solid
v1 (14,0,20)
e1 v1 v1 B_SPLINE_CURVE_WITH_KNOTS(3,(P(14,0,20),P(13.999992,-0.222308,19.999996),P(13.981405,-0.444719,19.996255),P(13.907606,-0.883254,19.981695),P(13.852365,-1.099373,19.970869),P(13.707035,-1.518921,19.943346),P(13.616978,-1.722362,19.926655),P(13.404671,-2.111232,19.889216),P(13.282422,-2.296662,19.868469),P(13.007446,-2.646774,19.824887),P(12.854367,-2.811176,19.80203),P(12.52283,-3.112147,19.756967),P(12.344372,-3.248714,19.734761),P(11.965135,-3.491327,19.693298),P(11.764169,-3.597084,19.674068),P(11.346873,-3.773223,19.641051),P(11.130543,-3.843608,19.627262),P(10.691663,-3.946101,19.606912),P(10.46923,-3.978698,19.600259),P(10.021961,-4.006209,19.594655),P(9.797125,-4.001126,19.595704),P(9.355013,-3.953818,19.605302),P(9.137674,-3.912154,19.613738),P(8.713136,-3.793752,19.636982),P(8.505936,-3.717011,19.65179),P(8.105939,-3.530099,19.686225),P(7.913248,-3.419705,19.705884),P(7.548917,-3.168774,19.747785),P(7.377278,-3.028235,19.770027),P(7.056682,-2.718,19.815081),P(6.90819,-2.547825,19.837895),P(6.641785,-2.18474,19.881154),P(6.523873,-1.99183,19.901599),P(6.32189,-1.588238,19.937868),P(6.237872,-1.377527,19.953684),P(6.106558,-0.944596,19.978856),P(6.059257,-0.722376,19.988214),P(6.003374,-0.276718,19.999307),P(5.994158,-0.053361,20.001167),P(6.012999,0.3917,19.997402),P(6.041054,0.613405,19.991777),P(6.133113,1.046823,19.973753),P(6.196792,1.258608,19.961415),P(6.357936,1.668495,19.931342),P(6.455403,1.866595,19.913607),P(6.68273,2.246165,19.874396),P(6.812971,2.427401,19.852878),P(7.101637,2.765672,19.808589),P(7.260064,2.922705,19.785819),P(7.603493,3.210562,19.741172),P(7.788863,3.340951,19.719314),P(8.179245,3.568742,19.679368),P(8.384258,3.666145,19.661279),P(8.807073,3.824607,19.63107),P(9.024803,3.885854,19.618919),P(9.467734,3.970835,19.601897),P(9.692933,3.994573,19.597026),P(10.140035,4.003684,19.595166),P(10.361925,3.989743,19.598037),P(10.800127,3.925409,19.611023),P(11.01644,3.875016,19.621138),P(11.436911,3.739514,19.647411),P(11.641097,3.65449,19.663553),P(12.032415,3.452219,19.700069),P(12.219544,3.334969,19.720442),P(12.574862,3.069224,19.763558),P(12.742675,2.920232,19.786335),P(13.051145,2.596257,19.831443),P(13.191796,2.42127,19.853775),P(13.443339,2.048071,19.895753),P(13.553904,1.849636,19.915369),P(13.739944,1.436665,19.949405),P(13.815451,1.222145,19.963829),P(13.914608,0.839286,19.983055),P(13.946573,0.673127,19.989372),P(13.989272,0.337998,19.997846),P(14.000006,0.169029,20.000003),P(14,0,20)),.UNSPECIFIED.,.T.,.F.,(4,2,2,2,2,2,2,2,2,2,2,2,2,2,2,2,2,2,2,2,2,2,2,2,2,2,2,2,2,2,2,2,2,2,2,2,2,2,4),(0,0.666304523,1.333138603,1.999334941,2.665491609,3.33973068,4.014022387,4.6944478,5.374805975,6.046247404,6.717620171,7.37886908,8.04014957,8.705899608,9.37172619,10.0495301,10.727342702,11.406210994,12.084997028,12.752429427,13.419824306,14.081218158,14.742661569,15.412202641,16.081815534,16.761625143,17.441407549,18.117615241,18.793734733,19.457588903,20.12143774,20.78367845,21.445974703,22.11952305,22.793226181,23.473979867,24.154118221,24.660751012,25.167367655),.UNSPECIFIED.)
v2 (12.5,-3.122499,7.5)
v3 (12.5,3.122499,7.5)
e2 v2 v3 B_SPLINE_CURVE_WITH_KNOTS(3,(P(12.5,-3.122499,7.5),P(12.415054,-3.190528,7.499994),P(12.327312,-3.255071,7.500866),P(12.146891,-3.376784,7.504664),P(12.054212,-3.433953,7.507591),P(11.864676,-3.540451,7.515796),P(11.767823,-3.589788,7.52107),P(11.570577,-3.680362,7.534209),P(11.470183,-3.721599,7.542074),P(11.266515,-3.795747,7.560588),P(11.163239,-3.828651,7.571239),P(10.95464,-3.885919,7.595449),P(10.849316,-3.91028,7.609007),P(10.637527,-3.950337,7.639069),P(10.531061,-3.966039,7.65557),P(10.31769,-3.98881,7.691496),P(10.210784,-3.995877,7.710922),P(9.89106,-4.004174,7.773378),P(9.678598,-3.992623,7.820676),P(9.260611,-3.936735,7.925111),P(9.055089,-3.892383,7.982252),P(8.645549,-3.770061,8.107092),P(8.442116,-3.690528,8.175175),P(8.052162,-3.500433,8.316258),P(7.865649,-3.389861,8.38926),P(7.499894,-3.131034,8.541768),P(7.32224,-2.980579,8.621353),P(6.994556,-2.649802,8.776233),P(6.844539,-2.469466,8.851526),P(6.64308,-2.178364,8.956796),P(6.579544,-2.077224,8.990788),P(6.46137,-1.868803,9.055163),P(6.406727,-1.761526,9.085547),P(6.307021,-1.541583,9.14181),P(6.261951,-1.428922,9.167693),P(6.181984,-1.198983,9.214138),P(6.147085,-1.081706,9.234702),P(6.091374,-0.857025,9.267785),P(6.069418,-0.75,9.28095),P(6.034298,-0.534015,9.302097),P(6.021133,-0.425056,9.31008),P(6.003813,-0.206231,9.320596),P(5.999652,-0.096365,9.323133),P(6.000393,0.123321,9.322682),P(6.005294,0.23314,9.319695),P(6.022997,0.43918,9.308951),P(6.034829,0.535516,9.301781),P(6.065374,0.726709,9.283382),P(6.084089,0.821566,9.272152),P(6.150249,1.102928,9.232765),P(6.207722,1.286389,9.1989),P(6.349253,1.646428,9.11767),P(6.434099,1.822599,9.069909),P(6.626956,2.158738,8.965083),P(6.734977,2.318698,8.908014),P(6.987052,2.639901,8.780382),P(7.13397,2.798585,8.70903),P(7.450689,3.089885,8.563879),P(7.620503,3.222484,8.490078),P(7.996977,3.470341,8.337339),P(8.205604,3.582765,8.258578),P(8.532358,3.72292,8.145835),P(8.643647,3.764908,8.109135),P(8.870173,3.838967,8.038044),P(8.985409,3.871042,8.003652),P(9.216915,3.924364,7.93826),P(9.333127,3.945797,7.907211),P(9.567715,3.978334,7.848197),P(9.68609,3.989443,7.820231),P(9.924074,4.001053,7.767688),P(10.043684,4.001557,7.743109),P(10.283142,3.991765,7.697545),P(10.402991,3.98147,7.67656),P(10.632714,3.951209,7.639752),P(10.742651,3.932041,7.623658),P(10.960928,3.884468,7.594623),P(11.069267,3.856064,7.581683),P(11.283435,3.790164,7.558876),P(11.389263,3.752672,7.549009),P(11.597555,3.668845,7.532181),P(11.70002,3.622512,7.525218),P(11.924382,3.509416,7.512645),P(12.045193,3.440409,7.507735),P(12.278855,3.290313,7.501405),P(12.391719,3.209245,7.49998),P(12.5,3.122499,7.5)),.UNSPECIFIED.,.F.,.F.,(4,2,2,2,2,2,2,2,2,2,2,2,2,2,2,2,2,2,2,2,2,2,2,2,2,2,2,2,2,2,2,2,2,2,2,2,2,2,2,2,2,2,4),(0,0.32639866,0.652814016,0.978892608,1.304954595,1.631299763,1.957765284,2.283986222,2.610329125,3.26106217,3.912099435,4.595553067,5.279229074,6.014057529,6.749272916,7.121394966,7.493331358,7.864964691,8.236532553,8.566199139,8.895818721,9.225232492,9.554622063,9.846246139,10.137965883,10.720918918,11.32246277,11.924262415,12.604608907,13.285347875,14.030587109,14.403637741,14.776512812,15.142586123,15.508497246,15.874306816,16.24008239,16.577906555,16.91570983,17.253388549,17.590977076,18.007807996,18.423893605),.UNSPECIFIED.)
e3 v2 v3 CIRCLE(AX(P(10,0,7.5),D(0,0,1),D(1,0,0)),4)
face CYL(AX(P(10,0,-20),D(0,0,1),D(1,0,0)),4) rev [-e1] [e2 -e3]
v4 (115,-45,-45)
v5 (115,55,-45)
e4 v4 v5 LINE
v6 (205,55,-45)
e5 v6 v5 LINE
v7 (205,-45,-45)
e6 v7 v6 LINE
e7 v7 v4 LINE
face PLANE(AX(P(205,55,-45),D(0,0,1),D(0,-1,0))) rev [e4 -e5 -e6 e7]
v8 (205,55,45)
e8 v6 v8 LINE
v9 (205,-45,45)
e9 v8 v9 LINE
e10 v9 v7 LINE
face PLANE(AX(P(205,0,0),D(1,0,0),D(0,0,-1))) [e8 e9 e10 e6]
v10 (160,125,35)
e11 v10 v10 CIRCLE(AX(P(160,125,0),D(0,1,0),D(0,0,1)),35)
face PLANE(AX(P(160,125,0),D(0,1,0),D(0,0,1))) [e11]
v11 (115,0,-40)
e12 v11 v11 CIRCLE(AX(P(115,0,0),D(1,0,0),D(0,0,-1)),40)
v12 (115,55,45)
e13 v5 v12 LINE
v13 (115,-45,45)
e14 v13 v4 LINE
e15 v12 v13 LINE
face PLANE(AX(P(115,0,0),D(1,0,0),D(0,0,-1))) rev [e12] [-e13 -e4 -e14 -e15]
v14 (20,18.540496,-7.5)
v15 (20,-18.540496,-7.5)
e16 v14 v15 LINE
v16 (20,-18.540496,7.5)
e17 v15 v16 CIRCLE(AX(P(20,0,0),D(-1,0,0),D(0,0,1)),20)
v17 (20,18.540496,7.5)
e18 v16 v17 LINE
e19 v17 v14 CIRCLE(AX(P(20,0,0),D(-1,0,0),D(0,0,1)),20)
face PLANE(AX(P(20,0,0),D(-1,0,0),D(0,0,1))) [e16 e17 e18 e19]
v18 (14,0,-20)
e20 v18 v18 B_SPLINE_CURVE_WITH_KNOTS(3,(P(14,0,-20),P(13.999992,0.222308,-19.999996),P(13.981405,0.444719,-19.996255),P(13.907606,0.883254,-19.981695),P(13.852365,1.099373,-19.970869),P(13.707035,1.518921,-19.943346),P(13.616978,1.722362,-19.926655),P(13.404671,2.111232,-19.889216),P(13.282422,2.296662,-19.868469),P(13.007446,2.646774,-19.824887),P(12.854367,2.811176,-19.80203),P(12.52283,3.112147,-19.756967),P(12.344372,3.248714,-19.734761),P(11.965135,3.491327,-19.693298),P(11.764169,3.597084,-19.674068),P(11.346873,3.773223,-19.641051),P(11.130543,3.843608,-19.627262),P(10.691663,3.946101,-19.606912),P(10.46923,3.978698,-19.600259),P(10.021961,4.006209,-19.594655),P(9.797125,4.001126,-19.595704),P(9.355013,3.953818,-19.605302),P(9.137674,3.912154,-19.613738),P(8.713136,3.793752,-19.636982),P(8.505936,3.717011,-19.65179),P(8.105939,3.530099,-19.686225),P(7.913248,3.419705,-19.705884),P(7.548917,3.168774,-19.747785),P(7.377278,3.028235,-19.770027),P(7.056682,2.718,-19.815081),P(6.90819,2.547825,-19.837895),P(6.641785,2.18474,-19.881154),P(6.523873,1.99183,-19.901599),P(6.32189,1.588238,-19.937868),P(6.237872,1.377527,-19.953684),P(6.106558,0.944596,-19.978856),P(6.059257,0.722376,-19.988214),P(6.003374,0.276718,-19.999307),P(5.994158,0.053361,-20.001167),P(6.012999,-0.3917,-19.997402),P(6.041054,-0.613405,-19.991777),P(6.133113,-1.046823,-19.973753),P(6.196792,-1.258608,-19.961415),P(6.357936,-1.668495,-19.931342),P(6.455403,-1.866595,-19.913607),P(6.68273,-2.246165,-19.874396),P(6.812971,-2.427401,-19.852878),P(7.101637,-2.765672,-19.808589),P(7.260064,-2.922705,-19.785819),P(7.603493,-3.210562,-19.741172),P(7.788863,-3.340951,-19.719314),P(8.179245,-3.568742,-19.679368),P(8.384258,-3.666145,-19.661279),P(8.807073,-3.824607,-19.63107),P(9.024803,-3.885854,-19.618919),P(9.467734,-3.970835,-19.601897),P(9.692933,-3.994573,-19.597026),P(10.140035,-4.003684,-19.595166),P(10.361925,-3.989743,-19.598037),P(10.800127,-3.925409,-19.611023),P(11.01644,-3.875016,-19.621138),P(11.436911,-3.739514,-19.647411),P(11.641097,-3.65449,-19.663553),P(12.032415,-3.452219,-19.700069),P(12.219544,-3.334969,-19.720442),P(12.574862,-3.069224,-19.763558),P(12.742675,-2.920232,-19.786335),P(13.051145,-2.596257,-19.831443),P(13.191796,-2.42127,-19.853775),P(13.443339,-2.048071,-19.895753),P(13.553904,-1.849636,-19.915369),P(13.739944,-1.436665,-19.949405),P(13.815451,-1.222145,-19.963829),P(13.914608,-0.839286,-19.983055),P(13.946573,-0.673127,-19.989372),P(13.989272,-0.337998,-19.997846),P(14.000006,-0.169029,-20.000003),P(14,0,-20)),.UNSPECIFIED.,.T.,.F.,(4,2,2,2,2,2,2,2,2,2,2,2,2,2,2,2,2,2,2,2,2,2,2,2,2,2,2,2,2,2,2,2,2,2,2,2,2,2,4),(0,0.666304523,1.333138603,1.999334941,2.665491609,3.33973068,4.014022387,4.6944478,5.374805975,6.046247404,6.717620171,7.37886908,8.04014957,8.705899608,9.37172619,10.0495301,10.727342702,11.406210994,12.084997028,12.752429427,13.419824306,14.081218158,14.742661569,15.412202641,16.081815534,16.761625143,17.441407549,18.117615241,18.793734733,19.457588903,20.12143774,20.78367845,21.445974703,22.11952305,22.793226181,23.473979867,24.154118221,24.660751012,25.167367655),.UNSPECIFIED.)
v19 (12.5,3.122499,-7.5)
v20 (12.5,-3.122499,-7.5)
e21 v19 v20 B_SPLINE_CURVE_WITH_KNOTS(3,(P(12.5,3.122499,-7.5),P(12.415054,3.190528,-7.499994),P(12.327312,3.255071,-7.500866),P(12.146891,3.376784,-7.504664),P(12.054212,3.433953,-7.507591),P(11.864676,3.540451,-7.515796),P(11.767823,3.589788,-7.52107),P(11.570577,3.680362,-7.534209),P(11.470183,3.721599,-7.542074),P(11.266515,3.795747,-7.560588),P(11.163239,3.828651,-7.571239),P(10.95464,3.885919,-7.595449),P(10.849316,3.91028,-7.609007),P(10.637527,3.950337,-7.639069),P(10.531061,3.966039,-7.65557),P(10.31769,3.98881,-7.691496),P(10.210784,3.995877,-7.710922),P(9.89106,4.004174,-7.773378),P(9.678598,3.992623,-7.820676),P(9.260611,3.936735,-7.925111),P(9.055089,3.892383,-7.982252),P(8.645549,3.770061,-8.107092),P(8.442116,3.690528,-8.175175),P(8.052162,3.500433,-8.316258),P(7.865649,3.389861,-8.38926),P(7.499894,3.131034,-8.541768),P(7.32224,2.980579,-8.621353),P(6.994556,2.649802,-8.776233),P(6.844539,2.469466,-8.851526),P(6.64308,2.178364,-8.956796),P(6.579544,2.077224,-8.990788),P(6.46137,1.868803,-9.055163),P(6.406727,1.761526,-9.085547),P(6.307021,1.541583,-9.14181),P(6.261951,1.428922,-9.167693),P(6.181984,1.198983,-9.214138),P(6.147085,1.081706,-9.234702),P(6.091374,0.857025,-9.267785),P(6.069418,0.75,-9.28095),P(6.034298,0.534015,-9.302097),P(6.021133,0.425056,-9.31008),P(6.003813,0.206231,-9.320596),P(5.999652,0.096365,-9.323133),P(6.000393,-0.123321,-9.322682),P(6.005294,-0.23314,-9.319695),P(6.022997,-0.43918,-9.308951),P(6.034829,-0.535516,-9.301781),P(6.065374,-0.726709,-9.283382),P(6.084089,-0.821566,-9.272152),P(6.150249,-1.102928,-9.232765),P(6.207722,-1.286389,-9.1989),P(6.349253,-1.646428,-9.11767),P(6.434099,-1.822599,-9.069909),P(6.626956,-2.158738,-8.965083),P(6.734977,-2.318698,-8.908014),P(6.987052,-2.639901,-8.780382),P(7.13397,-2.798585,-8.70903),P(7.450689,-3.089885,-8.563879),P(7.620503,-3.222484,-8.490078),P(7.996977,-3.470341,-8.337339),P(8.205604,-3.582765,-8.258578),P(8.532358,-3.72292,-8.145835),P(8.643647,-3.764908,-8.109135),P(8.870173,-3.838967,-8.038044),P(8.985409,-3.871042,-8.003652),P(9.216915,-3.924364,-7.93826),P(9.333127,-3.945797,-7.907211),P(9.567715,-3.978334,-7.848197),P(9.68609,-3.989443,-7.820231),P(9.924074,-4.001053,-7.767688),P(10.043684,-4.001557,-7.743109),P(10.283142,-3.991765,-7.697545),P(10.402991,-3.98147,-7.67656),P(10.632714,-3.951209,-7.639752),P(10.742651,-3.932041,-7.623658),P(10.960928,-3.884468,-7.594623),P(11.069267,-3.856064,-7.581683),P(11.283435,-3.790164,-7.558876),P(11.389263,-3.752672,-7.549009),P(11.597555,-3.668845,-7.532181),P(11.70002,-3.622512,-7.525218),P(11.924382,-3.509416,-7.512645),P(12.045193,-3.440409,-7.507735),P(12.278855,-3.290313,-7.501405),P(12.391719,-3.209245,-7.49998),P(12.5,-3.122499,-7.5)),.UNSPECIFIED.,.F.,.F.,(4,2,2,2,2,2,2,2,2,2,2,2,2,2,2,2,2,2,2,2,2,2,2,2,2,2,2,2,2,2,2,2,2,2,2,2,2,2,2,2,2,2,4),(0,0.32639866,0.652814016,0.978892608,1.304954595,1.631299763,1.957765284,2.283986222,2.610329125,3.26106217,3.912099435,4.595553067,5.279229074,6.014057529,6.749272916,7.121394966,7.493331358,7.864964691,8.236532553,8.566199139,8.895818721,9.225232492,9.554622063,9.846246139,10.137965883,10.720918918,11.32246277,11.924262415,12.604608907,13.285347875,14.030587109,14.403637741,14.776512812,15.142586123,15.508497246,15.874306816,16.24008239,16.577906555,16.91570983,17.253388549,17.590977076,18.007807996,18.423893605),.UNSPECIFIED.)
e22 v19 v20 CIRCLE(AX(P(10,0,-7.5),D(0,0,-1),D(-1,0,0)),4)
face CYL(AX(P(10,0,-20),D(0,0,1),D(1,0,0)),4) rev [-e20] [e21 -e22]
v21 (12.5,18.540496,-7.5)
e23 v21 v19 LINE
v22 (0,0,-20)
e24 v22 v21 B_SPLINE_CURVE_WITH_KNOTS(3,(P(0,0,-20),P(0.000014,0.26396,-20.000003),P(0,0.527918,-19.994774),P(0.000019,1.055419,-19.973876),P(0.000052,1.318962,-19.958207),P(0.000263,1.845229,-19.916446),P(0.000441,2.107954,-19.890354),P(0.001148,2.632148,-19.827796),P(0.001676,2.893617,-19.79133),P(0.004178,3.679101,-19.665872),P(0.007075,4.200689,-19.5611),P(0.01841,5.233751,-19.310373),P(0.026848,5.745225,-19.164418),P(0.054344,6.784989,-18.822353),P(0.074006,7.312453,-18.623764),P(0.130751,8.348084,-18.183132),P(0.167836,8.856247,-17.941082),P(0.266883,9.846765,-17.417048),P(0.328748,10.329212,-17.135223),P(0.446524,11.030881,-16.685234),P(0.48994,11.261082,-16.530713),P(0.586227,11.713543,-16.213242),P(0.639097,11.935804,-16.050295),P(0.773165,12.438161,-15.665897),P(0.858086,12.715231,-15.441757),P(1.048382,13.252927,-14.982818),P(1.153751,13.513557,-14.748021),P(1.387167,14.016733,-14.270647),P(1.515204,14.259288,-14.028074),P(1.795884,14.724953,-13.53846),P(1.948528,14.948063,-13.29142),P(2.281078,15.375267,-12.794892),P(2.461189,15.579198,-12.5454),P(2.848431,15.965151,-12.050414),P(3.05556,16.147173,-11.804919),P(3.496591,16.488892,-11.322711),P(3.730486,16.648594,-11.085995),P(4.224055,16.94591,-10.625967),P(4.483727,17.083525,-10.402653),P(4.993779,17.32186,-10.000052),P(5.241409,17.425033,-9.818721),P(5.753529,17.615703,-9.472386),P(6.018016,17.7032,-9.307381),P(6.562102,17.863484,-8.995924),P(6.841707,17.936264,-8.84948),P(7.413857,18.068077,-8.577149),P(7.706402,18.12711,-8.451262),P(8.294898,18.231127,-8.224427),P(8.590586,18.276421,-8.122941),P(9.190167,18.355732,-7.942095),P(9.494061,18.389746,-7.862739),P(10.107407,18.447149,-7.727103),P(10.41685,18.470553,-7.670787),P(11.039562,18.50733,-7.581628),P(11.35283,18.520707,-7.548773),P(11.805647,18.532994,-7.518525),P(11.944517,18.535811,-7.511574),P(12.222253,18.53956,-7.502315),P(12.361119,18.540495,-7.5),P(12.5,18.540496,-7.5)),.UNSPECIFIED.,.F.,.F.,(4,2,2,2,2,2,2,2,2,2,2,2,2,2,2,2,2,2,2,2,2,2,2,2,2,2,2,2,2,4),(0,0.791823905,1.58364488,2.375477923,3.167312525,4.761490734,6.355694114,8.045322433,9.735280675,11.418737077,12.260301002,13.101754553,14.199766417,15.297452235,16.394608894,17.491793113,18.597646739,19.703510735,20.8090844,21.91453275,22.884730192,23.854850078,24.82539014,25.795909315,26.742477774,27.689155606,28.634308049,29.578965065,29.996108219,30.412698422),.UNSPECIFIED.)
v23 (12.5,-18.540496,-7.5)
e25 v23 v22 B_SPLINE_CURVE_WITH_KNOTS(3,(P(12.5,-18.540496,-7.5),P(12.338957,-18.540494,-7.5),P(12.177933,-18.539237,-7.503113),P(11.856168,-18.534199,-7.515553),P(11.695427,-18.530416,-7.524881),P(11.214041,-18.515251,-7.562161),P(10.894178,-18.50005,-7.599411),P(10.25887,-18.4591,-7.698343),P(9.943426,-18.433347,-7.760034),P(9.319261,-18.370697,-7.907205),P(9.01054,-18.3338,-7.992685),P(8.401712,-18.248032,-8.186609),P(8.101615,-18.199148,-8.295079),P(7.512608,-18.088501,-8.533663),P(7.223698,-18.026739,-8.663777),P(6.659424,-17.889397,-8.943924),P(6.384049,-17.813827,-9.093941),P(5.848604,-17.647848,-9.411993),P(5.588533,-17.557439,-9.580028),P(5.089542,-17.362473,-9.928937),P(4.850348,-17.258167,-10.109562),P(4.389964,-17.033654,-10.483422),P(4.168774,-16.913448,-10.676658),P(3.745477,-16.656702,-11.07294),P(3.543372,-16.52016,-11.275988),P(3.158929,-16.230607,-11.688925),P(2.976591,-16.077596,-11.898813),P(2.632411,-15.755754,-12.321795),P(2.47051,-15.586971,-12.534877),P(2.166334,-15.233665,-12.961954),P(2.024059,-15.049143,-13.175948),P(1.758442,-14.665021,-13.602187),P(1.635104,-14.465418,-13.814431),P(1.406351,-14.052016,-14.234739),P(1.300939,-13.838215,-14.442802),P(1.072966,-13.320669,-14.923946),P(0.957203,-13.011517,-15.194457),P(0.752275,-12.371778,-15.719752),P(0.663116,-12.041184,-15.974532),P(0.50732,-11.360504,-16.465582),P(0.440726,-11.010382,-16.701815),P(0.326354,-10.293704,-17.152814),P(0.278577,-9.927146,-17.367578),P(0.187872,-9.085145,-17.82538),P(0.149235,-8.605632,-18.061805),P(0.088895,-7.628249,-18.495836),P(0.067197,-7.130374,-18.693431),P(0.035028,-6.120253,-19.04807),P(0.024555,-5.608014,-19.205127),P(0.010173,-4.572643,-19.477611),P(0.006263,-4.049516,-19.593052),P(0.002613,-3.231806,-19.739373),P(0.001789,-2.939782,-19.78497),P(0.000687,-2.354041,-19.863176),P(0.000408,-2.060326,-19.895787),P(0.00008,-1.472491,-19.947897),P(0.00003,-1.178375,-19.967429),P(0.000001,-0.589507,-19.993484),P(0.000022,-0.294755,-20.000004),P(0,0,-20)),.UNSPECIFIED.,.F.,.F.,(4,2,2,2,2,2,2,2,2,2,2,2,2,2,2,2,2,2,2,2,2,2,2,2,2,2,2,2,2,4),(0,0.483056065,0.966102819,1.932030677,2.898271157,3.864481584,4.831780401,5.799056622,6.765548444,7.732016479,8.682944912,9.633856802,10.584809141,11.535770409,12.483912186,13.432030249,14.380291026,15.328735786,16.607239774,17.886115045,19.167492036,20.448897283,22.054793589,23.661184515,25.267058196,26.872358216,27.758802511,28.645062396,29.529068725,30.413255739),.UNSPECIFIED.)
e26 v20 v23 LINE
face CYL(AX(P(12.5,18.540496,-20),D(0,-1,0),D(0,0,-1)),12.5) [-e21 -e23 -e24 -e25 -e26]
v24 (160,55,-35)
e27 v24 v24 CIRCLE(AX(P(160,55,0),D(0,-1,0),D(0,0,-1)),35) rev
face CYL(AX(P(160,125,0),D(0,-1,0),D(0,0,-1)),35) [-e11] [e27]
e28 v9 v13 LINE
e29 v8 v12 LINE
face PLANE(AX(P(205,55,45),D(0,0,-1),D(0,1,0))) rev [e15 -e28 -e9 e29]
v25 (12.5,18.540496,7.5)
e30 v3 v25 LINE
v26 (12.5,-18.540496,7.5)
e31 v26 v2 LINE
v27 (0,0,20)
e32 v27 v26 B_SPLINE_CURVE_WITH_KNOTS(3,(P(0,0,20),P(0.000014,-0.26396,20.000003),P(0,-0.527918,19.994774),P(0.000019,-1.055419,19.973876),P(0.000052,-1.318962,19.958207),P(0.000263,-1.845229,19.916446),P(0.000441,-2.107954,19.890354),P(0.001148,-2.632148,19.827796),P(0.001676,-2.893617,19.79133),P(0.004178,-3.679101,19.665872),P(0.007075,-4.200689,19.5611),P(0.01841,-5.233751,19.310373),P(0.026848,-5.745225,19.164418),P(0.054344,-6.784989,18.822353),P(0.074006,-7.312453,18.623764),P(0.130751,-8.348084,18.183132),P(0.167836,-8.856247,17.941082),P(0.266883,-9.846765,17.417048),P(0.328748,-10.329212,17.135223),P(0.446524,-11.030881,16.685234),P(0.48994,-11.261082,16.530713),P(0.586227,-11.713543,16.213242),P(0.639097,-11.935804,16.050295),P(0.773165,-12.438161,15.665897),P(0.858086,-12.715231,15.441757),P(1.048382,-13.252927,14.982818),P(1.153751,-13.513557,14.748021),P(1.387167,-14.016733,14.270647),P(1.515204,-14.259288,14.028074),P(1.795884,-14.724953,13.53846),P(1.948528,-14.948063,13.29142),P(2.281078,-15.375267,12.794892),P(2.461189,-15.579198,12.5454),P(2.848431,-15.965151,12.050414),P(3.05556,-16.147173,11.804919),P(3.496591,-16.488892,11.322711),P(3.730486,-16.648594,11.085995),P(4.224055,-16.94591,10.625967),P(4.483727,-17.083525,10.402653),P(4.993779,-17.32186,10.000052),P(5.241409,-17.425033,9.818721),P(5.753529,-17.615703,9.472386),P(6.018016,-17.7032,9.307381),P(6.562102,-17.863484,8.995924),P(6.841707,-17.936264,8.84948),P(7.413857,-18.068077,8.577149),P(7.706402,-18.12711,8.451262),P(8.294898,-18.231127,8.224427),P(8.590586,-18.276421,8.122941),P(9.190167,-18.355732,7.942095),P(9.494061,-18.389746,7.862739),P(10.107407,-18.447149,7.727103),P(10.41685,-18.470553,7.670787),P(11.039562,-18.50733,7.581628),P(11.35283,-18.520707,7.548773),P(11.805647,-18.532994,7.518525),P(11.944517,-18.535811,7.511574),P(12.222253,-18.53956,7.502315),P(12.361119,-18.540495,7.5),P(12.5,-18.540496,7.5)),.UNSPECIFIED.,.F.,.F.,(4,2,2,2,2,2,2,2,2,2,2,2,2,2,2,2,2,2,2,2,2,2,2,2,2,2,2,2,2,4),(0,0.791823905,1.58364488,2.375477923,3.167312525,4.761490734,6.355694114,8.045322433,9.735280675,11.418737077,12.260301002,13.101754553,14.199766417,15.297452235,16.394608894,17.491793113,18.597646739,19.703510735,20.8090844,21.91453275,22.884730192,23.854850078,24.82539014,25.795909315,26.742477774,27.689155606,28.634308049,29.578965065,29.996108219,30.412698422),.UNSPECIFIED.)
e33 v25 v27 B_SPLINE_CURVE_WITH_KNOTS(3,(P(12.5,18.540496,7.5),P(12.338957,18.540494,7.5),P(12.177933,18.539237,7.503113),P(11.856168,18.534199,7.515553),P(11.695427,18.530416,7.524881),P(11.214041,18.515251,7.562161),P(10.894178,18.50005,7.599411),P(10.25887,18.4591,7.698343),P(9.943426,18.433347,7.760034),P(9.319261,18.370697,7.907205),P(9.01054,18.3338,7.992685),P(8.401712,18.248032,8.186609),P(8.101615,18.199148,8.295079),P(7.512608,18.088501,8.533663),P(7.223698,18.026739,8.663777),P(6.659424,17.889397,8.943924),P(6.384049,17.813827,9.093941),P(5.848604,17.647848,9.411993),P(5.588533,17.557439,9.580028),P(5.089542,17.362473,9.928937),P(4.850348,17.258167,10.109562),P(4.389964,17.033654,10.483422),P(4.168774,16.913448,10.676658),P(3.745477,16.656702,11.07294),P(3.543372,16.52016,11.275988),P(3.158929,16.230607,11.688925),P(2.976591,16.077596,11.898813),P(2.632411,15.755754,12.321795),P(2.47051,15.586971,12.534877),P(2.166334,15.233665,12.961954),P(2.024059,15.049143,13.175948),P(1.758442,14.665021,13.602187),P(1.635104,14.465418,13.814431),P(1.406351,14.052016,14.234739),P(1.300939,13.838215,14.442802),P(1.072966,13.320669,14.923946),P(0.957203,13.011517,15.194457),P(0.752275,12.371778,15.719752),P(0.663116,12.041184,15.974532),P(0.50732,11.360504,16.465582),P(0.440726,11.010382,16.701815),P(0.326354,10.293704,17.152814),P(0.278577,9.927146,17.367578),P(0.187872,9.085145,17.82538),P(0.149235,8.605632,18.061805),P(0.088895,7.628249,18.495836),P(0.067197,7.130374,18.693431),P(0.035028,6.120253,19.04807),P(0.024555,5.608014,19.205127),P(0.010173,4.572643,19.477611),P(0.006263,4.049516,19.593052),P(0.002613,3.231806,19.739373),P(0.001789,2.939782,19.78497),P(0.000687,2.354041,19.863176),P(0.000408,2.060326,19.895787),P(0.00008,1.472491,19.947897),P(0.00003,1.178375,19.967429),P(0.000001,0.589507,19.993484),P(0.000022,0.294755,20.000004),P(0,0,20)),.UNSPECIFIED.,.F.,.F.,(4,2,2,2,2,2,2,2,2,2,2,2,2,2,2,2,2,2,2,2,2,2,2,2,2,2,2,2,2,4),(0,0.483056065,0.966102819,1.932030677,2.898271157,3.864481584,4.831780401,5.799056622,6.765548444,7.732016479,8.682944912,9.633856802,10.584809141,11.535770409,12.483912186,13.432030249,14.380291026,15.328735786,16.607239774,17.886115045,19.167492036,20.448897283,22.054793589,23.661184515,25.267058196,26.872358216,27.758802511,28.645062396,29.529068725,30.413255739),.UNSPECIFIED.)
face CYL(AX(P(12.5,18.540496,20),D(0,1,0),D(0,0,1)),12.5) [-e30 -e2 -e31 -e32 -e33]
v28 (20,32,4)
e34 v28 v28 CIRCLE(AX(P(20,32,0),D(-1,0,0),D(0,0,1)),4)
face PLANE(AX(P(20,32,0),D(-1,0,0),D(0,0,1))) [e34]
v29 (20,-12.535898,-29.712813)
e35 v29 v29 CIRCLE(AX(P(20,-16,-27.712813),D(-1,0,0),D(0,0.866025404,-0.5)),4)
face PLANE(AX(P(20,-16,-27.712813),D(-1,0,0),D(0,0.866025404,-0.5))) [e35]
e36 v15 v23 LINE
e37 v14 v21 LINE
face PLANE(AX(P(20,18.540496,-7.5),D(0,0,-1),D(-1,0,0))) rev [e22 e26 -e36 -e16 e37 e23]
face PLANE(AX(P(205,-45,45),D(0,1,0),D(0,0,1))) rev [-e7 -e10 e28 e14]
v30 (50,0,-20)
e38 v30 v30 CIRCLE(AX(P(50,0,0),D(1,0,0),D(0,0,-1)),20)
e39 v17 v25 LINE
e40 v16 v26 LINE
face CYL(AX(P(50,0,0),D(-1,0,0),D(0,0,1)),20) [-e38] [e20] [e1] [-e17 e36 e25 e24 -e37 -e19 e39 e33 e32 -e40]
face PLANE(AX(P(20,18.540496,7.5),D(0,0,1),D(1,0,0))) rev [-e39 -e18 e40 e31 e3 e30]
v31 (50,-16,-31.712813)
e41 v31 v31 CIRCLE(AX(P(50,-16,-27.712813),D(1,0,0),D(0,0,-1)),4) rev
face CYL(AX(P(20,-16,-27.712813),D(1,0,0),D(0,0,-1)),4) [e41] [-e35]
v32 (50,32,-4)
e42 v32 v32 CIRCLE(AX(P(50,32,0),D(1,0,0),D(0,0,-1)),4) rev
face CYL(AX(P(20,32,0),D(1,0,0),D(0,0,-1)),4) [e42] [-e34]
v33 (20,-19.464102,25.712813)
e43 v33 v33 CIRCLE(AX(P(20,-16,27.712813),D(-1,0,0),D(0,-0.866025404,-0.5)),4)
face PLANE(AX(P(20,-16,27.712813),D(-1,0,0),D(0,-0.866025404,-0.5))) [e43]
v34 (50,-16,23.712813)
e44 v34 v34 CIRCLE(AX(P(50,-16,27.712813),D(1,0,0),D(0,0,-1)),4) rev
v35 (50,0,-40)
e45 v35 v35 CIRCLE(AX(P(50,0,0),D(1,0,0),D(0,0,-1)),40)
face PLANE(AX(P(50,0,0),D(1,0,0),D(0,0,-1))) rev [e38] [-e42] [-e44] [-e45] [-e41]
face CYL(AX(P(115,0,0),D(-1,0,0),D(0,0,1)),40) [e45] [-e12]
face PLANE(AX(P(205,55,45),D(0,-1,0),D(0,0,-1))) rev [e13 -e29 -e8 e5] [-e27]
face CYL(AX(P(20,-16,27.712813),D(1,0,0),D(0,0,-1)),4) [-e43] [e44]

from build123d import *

# Parameters (mm, degrees)
SKETCH2_R               = 20
BOSS_EXTRUDE2_DEPTH     = 50
CUT_EXTRUDE1_DEPTH      = 20
FILLET1_R               = 12.5
CUT_EXTRUDE2_DEPTH      = 61.466933273
CUT_EXTRUDE2_DEPTH_BACK = 61.466933273
SKETCH4_R               = 4
SKETCH5_R               = 40
BOSS_EXTRUDE3_DEPTH     = 65
SKETCH7_R               = 4
BOSS_EXTRUDE5_DEPTH     = 30
CIRPATTERN1_COUNT       = 3
SKETCH8_W               = 90
SKETCH8_H               = 100
BOSS_EXTRUDE6_DEPTH     = 90
SKETCH9_R               = 35
BOSS_EXTRUDE7_DEPTH     = 70


with BuildPart() as part:
    # Sketch2 → Boss-Extrude2 (new body)
    with BuildSketch(Plane(origin=(0, 0, 0), x_dir=(0, 0, -1), z_dir=(1, 0, 0))):
        Circle(SKETCH2_R)
    extrude(amount=BOSS_EXTRUDE2_DEPTH)

    # Sketch3 → Cut-Extrude1 (cut)
    with BuildSketch(Plane.ZY):
        with BuildLine():
            Line((-7.5, 18.540496218), (-7.5, -18.540496218))
            ThreePointArc((-7.5, -18.540496218), (0, -20), (7.5, -18.540496218))
            Line((7.5, -18.540496218), (7.5, 18.540496218))
            ThreePointArc((7.5, 18.540496218), (0, 20), (-7.5, 18.540496218))
        make_face()
    extrude(amount=-CUT_EXTRUDE1_DEPTH, mode=Mode.SUBTRACT)

    # Fillet1
    fillet1_edges = [part.edges().sort_by_distance(p)[0] for p in [
        (0, 0, 7.5),
        (0, 0, -7.5),
    ]]
    fillet(fillet1_edges, radius=FILLET1_R - 0.0001)  # a hair under: the kernel refuses the full size

    # Sketch4 → Cut-Extrude2 (cut, two sides: drawn at the far end of the back side and taken through both)
    with BuildSketch(Plane.XY.offset(-7.5).offset(-CUT_EXTRUDE2_DEPTH_BACK)):
        with Locations((10, 0)):
            Circle(SKETCH4_R)
    extrude(amount=CUT_EXTRUDE2_DEPTH + CUT_EXTRUDE2_DEPTH_BACK, mode=Mode.SUBTRACT)

    # Sketch5 → Boss-Extrude3 (add)
    with BuildSketch(Plane(origin=(50, 0, 0), x_dir=(0, 0, -1), z_dir=(1, 0, 0))):
        Circle(SKETCH5_R)
    extrude(amount=BOSS_EXTRUDE3_DEPTH)

    # Sketch7 → Boss-Extrude5 (add)
    with BuildSketch(Plane.ZY.offset(-50)):
        with Locations(Location((0, 32, 0), (0, 0, 180))):
            Circle(SKETCH7_R)
    boss_extrude5 = extrude(amount=BOSS_EXTRUDE5_DEPTH)

    # CirPattern1: Boss-Extrude5 ×3 about axis
    cirpattern1_axis = Axis((0, 0, 0), (1, 0, 0))
    for i in range(1, CIRPATTERN1_COUNT):
        add(boss_extrude5.rotate(cirpattern1_axis, i * 360 / CIRPATTERN1_COUNT))

    # Sketch8 → Boss-Extrude6 (add)
    with BuildSketch(Plane(origin=(115, 0, 0), x_dir=(0, 0, -1), z_dir=(1, 0, 0))):
        with Locations((0, 5)):
            Rectangle(SKETCH8_W, SKETCH8_H)
    extrude(amount=BOSS_EXTRUDE6_DEPTH)

    # Sketch9 → Boss-Extrude7 (add)
    with BuildSketch(Plane(origin=(0, 55, 0), x_dir=(1, 0, 0), z_dir=(0, 1, 0))):
        with Locations(Location((160, 0, 0), (0, 0, 90))):
            Circle(SKETCH9_R)
    extrude(amount=BOSS_EXTRUDE7_DEPTH)


solid = part.part
